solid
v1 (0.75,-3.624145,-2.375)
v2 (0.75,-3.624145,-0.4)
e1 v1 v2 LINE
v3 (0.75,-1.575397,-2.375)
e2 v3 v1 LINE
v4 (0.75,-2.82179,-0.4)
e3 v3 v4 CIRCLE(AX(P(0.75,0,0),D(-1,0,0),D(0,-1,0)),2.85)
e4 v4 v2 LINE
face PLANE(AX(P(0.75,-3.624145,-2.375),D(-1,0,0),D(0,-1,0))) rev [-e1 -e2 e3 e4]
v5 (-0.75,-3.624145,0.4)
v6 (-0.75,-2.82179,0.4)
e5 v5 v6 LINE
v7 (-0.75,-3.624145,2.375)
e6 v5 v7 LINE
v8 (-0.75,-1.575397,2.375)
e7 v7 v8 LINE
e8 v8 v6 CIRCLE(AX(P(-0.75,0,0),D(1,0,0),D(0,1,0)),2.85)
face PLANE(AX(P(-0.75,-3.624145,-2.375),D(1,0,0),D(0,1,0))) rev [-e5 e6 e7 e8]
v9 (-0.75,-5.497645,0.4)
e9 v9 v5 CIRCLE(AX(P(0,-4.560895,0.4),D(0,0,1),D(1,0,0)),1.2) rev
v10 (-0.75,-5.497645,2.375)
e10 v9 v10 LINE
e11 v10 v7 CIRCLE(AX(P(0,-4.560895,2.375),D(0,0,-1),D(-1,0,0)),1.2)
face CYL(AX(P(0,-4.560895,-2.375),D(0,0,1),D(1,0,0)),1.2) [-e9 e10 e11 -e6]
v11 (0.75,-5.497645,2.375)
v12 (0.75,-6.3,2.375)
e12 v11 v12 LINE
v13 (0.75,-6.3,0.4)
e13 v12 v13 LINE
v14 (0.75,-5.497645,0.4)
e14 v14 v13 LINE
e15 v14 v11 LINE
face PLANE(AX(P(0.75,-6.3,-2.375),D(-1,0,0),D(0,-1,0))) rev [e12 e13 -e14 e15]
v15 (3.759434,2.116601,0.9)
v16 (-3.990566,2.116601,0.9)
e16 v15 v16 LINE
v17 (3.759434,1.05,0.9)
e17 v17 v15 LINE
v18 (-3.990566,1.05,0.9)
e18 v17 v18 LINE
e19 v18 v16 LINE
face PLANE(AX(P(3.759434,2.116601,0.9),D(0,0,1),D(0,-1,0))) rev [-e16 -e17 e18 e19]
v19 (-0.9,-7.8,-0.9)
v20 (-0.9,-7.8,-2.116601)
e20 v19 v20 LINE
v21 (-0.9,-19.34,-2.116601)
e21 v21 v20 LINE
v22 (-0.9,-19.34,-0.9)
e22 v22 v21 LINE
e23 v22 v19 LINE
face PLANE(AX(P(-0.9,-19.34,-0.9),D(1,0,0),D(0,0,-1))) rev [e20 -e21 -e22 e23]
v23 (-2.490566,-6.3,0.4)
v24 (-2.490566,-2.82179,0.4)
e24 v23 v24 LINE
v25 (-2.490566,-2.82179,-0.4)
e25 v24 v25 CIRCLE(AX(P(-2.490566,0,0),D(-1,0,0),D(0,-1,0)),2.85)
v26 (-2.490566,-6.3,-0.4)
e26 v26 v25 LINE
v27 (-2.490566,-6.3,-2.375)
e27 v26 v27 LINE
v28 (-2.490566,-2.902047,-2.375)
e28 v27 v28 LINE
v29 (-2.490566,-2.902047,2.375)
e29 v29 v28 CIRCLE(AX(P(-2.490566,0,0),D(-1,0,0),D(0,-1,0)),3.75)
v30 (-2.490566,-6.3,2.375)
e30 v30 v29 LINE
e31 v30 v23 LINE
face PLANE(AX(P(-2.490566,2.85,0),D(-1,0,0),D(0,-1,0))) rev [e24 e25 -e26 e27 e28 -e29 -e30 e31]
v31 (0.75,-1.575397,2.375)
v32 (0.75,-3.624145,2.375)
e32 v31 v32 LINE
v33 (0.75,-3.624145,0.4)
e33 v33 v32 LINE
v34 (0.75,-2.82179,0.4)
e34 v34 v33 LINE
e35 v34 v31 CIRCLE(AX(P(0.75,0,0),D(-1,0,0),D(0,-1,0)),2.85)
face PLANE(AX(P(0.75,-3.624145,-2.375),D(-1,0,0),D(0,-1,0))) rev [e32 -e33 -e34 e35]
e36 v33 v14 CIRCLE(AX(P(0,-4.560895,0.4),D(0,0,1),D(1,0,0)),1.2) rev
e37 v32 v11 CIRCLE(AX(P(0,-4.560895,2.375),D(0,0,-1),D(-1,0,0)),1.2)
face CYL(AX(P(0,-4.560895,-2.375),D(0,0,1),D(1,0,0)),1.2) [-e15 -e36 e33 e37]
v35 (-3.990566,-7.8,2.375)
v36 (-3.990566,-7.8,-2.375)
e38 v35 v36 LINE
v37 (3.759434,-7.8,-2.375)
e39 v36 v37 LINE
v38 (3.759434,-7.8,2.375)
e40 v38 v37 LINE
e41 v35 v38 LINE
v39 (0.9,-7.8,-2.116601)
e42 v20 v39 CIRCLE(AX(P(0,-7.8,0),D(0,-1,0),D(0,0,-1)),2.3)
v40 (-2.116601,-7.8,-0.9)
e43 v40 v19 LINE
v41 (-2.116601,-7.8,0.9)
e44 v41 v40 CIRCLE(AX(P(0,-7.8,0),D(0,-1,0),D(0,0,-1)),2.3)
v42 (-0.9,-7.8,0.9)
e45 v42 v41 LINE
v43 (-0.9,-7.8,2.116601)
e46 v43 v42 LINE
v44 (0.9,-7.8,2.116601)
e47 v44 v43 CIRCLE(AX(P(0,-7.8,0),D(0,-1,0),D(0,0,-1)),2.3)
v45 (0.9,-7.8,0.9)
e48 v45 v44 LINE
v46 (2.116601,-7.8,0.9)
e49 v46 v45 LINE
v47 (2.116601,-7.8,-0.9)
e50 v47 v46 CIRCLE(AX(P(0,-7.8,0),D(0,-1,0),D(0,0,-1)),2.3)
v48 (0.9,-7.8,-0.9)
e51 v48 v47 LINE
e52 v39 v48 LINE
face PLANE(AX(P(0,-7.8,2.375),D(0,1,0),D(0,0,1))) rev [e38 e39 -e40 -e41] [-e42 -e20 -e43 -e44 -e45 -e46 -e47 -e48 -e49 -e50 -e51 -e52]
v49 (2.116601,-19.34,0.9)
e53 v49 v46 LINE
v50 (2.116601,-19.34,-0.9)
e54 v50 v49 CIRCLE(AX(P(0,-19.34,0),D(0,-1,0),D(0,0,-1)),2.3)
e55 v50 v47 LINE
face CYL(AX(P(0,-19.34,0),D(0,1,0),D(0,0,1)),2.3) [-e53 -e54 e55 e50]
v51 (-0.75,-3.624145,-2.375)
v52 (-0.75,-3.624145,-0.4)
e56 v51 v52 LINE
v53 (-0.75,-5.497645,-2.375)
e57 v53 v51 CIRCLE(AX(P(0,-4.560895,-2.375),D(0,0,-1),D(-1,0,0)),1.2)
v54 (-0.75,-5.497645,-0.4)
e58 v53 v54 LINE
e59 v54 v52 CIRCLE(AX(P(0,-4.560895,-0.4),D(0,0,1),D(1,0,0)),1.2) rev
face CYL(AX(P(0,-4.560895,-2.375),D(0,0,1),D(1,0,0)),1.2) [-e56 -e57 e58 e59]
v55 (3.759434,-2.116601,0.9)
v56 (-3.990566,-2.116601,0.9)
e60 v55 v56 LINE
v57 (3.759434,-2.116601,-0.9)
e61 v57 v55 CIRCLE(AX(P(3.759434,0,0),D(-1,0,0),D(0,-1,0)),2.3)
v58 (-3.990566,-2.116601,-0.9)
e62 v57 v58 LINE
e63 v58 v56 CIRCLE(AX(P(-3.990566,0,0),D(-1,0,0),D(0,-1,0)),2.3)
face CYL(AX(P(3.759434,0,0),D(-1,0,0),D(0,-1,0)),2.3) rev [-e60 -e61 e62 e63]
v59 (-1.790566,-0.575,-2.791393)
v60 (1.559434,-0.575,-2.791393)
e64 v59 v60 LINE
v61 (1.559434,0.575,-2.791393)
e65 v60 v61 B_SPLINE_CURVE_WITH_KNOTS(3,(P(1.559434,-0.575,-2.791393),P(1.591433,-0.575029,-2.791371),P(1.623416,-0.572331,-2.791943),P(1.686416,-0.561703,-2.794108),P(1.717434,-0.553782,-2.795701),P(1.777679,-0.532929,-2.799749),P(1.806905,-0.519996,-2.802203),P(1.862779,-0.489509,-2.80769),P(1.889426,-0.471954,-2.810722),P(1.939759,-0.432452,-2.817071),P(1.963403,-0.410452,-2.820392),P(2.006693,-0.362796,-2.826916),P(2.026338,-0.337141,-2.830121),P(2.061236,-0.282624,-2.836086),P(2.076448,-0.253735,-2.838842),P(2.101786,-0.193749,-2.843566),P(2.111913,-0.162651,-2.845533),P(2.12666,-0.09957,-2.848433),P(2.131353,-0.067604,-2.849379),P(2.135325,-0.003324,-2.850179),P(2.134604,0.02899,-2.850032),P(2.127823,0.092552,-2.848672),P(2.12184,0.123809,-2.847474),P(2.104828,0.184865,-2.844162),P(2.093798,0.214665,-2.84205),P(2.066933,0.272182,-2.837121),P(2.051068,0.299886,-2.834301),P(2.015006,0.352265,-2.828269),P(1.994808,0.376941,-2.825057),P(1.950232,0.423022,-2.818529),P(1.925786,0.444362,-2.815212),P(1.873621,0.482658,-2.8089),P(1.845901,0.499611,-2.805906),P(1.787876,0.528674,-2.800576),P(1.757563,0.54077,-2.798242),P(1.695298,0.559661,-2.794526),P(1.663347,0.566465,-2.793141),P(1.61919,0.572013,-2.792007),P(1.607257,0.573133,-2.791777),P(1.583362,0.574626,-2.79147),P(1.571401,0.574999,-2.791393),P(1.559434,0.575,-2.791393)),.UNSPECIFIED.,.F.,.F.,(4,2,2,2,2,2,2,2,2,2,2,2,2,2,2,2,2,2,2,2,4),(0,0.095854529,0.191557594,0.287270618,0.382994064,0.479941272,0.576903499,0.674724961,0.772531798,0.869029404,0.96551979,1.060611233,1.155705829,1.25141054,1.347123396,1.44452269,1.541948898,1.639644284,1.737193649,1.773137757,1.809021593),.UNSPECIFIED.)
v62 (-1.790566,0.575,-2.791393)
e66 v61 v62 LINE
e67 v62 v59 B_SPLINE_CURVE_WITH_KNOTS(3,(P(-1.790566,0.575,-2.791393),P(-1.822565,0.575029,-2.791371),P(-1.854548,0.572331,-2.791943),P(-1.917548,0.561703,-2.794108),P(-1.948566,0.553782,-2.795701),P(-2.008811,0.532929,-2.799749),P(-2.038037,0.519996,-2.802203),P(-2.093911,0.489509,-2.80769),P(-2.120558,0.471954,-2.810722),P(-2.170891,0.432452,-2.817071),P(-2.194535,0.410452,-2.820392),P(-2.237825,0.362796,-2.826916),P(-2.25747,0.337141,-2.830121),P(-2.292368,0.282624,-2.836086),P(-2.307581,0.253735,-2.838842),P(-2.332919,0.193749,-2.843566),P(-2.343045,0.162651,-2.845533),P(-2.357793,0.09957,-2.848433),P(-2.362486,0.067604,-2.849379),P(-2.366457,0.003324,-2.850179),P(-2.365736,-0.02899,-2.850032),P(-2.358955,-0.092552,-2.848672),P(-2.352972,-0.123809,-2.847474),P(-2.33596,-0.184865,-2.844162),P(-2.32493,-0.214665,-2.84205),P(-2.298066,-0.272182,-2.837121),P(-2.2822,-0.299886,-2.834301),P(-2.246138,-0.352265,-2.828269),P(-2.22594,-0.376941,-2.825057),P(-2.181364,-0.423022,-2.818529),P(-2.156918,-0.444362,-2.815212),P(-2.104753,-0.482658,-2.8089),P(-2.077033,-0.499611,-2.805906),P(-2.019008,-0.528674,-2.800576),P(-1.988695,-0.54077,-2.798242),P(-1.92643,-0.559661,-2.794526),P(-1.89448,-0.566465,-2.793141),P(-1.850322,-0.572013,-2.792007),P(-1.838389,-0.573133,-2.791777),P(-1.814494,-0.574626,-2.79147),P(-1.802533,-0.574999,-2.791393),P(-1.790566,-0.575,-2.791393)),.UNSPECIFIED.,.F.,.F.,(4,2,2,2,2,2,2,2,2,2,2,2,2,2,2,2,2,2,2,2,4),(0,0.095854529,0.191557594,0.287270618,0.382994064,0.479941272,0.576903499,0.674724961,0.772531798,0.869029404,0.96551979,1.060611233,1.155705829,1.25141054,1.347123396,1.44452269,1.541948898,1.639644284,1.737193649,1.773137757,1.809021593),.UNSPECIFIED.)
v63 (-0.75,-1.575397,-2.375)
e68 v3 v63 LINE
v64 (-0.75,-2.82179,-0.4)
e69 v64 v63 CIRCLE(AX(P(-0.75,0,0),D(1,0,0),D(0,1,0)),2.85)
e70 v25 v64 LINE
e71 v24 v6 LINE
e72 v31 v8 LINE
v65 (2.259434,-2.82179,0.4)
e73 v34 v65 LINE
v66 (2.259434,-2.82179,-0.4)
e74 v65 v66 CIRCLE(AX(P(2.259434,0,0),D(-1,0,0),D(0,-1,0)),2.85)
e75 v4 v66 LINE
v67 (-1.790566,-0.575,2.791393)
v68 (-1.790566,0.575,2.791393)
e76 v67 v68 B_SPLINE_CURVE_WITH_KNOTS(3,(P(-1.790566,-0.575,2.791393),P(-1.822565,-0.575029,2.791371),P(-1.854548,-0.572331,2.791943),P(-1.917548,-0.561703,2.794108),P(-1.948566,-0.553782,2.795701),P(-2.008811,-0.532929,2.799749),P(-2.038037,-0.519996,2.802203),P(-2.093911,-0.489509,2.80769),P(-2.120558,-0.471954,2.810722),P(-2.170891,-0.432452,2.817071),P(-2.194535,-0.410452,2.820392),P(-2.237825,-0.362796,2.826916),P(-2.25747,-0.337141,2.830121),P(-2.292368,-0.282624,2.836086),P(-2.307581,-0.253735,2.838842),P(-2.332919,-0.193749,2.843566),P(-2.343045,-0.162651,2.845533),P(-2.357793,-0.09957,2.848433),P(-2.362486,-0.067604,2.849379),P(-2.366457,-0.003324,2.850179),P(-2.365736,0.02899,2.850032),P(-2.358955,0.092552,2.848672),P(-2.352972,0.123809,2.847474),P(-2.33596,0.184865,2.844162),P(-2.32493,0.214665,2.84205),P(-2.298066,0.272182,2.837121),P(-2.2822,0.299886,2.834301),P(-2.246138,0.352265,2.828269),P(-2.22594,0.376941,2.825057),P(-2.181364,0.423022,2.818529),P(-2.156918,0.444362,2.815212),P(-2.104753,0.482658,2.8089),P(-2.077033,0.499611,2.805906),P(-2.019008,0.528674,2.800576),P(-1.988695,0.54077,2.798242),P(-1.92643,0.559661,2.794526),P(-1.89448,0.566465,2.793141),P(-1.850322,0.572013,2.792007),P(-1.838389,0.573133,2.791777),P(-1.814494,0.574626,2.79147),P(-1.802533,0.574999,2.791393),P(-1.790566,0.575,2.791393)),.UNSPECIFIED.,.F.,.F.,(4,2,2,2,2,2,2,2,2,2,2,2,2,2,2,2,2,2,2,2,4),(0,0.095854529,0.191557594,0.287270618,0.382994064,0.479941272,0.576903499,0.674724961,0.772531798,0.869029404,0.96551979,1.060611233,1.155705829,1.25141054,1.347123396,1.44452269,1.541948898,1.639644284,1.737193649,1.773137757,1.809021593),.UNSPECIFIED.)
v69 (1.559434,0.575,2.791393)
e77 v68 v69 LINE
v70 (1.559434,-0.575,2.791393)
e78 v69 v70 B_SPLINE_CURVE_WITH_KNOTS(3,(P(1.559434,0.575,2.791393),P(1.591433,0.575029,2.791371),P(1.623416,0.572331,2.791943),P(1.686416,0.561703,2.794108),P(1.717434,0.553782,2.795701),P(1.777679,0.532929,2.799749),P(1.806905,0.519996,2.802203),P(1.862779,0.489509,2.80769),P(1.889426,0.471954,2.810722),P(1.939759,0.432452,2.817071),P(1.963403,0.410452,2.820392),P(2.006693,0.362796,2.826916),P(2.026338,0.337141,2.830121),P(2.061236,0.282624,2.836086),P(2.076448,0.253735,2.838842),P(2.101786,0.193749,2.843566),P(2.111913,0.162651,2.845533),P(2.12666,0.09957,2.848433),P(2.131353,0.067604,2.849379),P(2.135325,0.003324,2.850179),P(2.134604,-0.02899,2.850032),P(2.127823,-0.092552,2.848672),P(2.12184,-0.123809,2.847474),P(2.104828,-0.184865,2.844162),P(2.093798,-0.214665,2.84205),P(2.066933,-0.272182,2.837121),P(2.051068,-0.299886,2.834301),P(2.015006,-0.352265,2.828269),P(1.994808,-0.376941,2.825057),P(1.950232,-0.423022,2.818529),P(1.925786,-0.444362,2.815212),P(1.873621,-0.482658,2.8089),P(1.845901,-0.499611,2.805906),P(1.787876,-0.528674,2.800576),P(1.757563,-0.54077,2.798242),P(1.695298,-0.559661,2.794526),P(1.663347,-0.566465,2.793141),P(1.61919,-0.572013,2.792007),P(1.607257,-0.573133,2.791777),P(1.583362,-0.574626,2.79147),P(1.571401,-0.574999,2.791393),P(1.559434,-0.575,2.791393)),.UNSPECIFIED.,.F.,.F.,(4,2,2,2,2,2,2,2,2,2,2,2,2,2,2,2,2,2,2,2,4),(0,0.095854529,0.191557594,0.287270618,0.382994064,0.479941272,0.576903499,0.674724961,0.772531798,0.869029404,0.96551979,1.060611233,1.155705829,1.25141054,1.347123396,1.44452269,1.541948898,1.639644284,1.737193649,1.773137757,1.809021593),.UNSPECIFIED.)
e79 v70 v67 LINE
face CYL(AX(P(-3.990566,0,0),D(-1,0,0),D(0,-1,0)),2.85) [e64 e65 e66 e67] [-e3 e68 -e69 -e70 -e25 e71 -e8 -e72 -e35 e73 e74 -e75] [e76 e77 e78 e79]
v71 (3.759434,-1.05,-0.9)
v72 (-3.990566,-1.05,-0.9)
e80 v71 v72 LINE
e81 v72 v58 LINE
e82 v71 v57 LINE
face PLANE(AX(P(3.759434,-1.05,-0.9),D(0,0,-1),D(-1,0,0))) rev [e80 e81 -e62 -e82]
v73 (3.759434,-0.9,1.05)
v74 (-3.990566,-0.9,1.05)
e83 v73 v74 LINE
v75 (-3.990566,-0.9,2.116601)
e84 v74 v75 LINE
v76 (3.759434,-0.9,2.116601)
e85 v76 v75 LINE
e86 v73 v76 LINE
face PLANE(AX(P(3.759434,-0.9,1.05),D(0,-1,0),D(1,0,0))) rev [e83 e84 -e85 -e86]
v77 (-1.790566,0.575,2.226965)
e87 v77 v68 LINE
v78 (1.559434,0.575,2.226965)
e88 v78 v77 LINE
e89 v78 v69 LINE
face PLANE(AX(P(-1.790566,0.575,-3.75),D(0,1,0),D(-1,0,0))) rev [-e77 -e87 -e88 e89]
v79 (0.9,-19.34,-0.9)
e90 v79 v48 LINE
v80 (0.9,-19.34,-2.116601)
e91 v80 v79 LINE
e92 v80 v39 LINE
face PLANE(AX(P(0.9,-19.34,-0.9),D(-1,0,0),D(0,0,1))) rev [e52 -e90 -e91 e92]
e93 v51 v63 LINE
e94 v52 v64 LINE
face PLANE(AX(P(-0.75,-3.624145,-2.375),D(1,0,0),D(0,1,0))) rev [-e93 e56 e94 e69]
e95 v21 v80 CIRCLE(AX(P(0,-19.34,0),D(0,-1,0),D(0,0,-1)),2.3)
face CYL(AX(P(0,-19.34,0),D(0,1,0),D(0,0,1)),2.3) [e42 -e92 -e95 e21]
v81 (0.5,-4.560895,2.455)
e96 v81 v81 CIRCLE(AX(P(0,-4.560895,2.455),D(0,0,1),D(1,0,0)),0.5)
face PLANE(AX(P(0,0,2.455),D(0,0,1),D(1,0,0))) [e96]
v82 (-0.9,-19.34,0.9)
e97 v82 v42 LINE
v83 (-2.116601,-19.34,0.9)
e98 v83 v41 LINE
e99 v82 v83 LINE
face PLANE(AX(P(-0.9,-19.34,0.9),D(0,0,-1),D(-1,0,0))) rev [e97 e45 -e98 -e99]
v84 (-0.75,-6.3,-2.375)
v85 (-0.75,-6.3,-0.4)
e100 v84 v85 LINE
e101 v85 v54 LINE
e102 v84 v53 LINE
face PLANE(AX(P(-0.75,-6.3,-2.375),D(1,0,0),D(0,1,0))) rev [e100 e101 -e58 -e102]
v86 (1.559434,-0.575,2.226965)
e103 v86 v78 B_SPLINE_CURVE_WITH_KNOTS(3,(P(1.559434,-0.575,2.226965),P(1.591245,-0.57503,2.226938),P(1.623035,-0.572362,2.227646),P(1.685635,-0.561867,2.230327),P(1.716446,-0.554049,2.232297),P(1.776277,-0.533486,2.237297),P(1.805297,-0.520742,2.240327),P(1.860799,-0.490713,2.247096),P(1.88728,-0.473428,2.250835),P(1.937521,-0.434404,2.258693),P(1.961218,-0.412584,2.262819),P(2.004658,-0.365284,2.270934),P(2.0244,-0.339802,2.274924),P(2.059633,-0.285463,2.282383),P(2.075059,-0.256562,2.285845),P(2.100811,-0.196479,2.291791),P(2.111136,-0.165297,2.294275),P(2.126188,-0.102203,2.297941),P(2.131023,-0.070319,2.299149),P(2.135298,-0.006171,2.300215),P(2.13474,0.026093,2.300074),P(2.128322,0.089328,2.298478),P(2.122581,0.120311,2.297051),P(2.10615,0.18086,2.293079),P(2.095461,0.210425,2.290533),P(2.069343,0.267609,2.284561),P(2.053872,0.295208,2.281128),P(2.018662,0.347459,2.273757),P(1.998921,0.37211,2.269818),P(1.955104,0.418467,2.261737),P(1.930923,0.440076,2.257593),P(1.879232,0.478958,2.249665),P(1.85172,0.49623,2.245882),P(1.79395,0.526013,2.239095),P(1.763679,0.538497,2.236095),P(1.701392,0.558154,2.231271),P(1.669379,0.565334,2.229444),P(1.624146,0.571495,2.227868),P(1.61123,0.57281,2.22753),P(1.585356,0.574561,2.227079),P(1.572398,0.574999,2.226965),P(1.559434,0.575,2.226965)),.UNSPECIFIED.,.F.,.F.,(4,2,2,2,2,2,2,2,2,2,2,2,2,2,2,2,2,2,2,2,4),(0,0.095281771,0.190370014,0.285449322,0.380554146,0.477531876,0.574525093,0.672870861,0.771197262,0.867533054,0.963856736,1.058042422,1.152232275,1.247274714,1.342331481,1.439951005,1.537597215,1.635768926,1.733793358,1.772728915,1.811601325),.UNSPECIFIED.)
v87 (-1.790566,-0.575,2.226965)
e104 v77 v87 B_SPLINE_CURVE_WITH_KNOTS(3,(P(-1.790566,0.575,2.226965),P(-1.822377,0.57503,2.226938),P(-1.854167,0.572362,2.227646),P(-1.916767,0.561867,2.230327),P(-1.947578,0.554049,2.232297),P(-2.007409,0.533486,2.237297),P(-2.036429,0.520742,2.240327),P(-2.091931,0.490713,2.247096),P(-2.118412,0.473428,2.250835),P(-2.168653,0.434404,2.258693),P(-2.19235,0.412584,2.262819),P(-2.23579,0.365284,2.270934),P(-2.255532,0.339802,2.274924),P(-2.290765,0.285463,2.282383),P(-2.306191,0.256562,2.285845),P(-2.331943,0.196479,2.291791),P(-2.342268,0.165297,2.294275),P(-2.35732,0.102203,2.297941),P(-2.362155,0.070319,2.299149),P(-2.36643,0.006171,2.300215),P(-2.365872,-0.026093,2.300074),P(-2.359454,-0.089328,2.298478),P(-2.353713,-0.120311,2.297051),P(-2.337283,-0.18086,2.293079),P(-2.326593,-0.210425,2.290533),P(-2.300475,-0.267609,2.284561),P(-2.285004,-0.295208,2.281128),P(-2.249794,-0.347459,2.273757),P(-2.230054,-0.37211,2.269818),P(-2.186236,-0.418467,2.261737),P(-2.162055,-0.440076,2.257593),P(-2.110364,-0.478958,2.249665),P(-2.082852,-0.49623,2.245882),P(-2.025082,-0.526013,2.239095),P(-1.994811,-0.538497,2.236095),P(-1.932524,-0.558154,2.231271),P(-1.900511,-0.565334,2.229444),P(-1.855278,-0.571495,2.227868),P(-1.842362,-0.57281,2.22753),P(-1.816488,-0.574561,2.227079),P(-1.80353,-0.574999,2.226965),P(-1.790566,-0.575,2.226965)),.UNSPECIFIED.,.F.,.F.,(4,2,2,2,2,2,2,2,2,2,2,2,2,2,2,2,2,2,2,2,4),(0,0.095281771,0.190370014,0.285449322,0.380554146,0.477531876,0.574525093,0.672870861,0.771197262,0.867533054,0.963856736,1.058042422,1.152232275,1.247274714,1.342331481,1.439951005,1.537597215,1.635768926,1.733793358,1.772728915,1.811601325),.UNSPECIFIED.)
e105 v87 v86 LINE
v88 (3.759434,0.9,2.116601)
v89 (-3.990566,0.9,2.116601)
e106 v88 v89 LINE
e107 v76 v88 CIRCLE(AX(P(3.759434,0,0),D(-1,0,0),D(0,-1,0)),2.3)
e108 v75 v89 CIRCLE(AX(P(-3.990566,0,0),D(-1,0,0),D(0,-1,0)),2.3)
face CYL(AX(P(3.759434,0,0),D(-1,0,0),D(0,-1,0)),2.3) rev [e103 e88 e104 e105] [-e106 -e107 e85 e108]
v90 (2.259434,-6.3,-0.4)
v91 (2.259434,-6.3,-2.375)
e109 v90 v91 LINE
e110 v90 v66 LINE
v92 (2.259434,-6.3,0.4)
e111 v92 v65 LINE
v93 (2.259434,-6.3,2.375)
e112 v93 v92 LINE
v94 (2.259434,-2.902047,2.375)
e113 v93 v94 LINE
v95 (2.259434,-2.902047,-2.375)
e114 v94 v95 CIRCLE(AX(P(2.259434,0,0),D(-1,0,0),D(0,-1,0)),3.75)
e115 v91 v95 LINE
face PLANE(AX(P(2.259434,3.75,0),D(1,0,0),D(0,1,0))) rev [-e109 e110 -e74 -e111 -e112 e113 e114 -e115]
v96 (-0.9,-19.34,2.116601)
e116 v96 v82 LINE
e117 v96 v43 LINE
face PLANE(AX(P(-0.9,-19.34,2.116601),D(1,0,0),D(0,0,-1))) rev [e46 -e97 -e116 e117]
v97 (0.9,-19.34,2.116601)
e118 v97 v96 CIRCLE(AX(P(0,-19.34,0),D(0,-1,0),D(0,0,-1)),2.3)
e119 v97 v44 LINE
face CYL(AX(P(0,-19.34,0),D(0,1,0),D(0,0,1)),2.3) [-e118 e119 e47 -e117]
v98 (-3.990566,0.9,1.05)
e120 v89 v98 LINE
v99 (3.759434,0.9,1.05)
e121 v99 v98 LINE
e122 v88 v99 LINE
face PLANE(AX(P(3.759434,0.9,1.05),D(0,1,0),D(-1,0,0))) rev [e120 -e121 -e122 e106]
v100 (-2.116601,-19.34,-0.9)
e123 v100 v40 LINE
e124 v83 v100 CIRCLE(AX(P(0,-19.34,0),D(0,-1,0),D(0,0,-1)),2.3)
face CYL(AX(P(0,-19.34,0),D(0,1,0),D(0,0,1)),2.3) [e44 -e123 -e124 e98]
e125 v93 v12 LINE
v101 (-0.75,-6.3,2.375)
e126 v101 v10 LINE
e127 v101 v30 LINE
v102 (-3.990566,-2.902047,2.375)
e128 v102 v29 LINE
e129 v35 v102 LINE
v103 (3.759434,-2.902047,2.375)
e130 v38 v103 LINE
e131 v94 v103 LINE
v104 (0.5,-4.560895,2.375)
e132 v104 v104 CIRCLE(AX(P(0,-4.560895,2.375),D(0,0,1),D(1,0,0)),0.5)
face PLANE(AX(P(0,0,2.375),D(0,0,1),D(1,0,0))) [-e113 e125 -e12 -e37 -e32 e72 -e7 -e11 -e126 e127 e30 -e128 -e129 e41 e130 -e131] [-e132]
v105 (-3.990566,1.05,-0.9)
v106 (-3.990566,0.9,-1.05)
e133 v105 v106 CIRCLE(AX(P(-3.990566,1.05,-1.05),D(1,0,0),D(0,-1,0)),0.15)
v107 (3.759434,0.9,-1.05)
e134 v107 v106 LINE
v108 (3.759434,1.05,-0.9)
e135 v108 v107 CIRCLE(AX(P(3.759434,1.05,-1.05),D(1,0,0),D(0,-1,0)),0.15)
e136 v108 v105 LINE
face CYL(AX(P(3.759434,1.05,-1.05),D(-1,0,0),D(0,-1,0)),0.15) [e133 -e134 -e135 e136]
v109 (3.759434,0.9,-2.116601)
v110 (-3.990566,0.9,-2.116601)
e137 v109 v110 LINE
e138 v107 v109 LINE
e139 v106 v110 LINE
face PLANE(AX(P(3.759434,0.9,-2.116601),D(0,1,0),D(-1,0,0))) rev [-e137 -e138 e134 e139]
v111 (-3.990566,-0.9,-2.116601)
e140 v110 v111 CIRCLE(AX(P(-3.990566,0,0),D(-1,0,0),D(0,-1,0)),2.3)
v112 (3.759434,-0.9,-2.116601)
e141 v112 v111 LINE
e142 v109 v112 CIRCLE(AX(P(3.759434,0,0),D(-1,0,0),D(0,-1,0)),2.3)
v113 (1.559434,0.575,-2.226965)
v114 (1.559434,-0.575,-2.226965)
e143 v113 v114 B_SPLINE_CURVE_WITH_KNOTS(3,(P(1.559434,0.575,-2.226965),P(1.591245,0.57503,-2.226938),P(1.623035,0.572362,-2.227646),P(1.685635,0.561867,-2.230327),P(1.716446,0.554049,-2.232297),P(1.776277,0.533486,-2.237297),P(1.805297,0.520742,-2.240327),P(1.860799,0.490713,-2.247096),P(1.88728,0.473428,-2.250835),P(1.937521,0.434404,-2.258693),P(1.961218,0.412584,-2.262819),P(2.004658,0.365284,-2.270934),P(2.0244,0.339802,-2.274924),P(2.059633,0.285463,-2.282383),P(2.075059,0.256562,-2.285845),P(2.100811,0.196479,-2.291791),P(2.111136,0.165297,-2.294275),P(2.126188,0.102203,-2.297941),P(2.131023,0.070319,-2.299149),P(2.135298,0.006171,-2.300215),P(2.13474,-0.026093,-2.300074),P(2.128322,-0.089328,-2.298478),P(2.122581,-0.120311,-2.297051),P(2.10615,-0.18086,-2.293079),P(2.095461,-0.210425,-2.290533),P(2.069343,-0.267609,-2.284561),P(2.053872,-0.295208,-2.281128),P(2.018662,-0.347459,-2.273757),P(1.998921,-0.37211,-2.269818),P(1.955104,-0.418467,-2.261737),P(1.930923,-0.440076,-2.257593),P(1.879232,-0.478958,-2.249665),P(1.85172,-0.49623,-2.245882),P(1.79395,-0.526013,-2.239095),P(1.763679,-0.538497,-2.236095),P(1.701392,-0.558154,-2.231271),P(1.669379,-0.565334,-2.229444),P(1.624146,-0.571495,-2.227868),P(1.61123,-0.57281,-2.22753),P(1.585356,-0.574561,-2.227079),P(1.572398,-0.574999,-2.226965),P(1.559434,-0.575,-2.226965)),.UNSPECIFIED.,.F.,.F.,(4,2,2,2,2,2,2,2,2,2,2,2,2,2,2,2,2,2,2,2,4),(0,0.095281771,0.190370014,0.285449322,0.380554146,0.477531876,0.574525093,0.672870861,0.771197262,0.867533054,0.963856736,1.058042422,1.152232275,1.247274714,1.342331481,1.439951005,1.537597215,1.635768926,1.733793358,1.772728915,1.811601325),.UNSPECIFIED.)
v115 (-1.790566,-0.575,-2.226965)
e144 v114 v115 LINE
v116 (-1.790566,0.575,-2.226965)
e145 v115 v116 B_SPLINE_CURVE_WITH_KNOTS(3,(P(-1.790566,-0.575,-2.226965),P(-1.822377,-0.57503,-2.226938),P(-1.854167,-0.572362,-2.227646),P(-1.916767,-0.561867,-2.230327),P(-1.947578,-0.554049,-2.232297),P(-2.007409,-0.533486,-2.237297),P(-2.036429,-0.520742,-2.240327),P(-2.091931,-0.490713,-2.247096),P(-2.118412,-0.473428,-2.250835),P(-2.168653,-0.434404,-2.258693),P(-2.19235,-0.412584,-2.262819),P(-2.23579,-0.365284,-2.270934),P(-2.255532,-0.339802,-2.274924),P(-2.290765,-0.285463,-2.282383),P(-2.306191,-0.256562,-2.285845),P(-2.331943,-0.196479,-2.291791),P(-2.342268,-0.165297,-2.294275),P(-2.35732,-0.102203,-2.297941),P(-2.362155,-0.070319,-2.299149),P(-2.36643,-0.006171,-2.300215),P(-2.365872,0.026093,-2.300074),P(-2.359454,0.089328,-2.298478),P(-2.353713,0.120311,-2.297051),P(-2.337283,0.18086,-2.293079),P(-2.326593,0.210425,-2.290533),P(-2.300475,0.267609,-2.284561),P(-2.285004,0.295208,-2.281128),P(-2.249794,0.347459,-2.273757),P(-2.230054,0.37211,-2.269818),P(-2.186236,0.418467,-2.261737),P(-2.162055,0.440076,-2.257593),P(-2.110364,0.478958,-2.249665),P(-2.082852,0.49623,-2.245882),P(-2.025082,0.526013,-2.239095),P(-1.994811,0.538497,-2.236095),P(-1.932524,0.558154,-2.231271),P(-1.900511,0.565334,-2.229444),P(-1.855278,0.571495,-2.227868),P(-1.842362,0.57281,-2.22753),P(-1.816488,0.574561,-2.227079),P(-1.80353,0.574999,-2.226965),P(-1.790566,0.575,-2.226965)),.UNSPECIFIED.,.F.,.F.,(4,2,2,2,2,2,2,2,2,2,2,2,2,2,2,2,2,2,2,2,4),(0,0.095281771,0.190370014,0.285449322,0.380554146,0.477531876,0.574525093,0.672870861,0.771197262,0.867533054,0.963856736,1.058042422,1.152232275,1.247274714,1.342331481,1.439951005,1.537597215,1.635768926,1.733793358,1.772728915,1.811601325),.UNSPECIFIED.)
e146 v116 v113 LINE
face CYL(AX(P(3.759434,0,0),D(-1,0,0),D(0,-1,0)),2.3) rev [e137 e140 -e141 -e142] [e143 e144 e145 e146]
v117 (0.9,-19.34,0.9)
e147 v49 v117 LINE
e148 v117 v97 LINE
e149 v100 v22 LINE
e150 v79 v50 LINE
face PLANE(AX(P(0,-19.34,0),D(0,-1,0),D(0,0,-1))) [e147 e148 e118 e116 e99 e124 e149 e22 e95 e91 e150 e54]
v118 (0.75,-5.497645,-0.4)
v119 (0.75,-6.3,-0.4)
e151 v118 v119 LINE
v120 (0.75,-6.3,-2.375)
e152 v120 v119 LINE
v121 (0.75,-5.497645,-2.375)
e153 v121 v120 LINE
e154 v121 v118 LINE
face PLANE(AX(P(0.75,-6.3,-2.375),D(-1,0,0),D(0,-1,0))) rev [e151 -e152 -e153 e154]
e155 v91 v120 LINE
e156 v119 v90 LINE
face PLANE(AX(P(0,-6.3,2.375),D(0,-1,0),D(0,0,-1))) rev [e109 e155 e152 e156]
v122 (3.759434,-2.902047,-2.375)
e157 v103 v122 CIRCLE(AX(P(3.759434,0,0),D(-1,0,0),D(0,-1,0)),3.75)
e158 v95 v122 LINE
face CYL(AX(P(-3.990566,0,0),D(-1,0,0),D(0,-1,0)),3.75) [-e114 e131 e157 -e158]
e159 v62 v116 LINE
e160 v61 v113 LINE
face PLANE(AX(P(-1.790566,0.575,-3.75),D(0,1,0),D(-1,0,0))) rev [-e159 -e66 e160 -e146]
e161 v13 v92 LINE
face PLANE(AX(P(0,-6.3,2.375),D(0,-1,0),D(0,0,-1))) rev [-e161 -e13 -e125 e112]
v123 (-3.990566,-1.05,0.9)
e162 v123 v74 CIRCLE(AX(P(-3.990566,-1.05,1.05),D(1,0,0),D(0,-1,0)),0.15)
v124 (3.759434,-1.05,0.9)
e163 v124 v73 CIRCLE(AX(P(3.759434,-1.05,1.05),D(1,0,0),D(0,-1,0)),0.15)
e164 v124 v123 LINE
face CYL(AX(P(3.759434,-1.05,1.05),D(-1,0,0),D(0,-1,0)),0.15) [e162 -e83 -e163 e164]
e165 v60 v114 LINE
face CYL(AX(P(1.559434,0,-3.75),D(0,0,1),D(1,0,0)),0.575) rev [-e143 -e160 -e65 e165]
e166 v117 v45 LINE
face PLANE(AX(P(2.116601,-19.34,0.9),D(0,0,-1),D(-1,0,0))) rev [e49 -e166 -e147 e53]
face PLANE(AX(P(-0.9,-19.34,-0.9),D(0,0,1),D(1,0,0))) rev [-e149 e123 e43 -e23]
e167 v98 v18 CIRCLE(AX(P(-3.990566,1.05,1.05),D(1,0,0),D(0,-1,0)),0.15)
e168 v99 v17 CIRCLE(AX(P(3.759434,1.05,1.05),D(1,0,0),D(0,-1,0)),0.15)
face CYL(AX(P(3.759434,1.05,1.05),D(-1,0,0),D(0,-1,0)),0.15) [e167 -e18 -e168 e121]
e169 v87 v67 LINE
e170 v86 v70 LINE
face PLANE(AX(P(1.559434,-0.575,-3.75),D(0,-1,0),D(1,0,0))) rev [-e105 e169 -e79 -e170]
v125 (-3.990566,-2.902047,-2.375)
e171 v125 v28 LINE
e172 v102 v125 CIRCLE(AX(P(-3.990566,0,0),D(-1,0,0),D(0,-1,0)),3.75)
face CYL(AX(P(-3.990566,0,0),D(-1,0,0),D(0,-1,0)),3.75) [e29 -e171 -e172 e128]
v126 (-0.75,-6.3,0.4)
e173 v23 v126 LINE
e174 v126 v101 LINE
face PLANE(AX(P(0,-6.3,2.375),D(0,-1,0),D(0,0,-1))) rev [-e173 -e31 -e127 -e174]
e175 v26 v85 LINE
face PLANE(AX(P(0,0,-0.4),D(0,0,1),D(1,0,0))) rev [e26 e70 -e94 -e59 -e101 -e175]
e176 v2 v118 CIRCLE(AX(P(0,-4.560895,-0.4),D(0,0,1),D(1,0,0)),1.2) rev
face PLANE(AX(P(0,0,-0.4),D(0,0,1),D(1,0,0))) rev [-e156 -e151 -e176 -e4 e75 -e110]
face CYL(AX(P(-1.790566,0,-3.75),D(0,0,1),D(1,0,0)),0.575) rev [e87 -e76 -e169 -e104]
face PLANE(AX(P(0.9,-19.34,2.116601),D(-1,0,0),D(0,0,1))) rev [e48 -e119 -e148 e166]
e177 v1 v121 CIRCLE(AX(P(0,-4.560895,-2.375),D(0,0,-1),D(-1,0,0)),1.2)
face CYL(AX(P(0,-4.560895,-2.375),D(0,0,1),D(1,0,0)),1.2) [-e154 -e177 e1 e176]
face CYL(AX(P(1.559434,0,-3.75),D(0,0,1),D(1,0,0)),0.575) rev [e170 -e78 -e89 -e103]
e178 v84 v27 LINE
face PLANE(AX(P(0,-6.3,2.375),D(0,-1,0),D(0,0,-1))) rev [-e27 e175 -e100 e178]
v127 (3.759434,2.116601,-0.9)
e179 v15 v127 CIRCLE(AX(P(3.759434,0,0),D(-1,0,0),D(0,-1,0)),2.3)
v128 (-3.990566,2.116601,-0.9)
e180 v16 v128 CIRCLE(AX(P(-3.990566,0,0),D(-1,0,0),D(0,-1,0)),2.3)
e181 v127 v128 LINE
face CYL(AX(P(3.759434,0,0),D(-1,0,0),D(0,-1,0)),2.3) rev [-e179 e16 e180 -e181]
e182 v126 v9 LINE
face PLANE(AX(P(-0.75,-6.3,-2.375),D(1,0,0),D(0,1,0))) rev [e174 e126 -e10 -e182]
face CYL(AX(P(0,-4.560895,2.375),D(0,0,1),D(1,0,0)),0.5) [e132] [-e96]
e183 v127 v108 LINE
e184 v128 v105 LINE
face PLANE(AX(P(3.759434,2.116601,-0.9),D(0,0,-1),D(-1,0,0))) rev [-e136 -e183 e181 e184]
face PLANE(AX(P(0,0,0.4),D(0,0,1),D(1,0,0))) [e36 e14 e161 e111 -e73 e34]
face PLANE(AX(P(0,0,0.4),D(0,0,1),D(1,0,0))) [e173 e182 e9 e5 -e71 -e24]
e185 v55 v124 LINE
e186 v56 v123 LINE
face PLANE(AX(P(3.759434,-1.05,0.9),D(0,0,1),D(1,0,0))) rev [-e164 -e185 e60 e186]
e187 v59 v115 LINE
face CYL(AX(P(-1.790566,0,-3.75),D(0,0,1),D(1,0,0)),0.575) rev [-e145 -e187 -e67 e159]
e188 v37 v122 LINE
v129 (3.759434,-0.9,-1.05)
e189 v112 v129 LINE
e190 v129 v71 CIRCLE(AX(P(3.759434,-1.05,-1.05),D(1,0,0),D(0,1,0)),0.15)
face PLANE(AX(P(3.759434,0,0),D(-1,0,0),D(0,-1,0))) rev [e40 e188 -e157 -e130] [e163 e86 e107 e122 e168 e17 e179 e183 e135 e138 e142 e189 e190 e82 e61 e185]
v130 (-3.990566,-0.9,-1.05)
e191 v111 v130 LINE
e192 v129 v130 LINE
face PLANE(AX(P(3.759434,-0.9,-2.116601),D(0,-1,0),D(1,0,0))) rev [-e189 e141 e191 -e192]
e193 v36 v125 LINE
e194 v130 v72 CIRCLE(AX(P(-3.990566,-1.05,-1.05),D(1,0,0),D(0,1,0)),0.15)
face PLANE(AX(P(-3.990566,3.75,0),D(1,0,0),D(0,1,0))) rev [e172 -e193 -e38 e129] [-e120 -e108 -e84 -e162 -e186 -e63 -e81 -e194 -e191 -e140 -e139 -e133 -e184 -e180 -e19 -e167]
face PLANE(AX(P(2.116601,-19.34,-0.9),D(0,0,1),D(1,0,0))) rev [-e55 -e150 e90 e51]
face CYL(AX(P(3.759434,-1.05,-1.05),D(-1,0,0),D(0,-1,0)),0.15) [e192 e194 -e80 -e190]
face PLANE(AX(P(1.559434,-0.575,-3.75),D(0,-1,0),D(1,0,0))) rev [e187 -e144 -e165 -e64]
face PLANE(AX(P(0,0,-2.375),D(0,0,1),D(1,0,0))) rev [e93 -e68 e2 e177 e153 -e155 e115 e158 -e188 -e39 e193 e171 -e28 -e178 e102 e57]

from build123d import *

# Parameters (mm, degrees)
SKETCH3_W               = 4.75
SKETCH3_H               = 5.746351638
BOSS_EXTRUDE1_DEPTH     = 0.4
BOSS_EXTRUDE2_DEPTH     = 2.375
BOSS_EXTRUDE3_DEPTH     = 2.375
CUT_EXTRUDE1_DEPTH      = 12.617443781
CUT_EXTRUDE2_DEPTH      = 10.530326191
CUT_EXTRUDE2_DEPTH_BACK = 10.530326191
WRAP1_OUTLINE_R         = 0.5
WRAP1_DEPTH             = 0.08
BOSS_EXTRUDE4_DEPTH     = 11.54


# Read off the part's stored shape, not the designer's step: Wrap1
with BuildPart() as part:
    # Sketch1 → Revolve1 (revolve)
    with BuildSketch(Plane.XY, mode=Mode.PRIVATE) as revolve1_sk:
        Polygon((-3.990566038, 0), (3.759433962, 0), (3.759433962, 3.75), (2.259433962, 3.75), (2.259433962, 2.85), (-2.490566038, 2.85), (-2.490566038, 3.75), (-3.990566038, 3.75), align=None)
    revolve(revolve1_sk.sketch.rotate(Axis((-3.990566038, 0, 0), (1, 0, 0)), 180), axis=Axis((-3.990566038, 0, 0), (1, 0, 0)))

    # Sketch3 → Boss-Extrude1 (add, symmetric)
    with BuildSketch(Plane.XY):
        with Locations((-0.115566038, -3.426824181)):
            Rectangle(SKETCH3_W, SKETCH3_H)
    extrude(amount=BOSS_EXTRUDE1_DEPTH, both=True)

    # Sketch3<7> → Boss-Extrude2 (add, symmetric)
    with BuildSketch(Plane.XY):
        Polygon((2.259433962, -0.553648362), (2.259433962, -6.3), (-2.490566038, -6.3), (-2.490566038, -0.553648362), (-3.990566038, -0.553648362), (-3.990566038, -7.8), (3.759433962, -7.8), (3.759433962, -0.553648362), align=None)
    extrude(amount=BOSS_EXTRUDE2_DEPTH, both=True)

    # Sketch5 → Boss-Extrude3 (add, symmetric)
    with BuildSketch(Plane(origin=(0, 0, 0), x_dir=(-1, 0, 0), z_dir=(0, 0, -1))):
        with BuildLine():
            Line((-0.75, -6.3), (0.75, -6.3))
            Line((0.75, -6.3), (0.75, -5.497644806))
            ThreePointArc((0.75, -5.497644806), (1.2, -4.560895106), (0.75, -3.624145406))
            Line((0.75, -3.624145406), (0.75, -2.821790212))
            Line((0.75, -2.821790212), (0.75, -1.153612006))
            Line((0.75, -1.153612006), (-0.75, -1.153612006))
            Line((-0.75, -1.153612006), (-0.75, -2.821790212))
            Line((-0.75, -2.821790212), (-0.75, -3.624145406))
            ThreePointArc((-0.75, -3.624145406), (-1.2, -4.560895106), (-0.75, -5.497644806))
            Line((-0.75, -5.497644806), (-0.75, -6.3))
        make_face()
    extrude(amount=BOSS_EXTRUDE3_DEPTH, both=True)

    # Sketch2 → Cut-Extrude1 (cut, through all)
    with BuildSketch(Plane.ZY.offset(3.990566038)):
        with BuildLine():
            Line((-0.9, 2.116601049), (-0.9, 1.05))
            ThreePointArc((-0.9, 1.05), (-0.943933983, 0.943933983), (-1.05, 0.9))
            Line((-1.05, 0.9), (-2.116601049, 0.9))
            ThreePointArc((-2.116601049, 0.9), (-2.3, 0), (-2.116601049, -0.9))
            Line((-2.116601049, -0.9), (-1.05, -0.9))
            ThreePointArc((-1.05, -0.9), (-0.943933983, -0.943933983), (-0.9, -1.05))
            Line((-0.9, -1.05), (-0.9, -2.116601049))
            ThreePointArc((-0.9, -2.116601049), (0, -2.3), (0.9, -2.116601049))
            Line((0.9, -2.116601049), (0.9, -1.05))
            ThreePointArc((0.9, -1.05), (0.943933983, -0.943933983), (1.05, -0.9))
            Line((1.05, -0.9), (2.116601049, -0.9))
            ThreePointArc((2.116601049, -0.9), (2.3, 0), (2.116601049, 0.9))
            Line((2.116601049, 0.9), (1.05, 0.9))
            ThreePointArc((1.05, 0.9), (0.943933983, 0.943933983), (0.9, 1.05))
            Line((0.9, 1.05), (0.9, 2.116601049))
            ThreePointArc((0.9, 2.116601049), (0, 2.3), (-0.9, 2.116601049))
        make_face()
    extrude(amount=-CUT_EXTRUDE1_DEPTH, mode=Mode.SUBTRACT)

    # Sketch4 → Cut-Extrude2 (cut, two sides: drawn at the far end of the back side and taken through both)
    with BuildSketch(Plane.XY.offset(-CUT_EXTRUDE2_DEPTH_BACK)):
        with BuildLine():
            Line((-1.790566038, 0.575), (1.559433962, 0.575))
            ThreePointArc((1.559433962, 0.575), (2.134433962, 0), (1.559433962, -0.575))
            Line((1.559433962, -0.575), (-1.790566038, -0.575))
            ThreePointArc((-1.790566038, -0.575), (-2.365566038, 0), (-1.790566038, 0.575))
        make_face()
    extrude(amount=CUT_EXTRUDE2_DEPTH + CUT_EXTRUDE2_DEPTH_BACK, mode=Mode.SUBTRACT)

    # Wrap1 outline → Wrap1 (add)
    with BuildSketch(Plane.XY.offset(2.375)):
        with Locations((0, -4.560895106)):
            Circle(WRAP1_OUTLINE_R)
    extrude(amount=WRAP1_DEPTH)

    # Sketch7 → Boss-Extrude4 (add)
    with BuildSketch(Plane.XZ.offset(7.8)):
        with BuildLine():
            Line((-0.9, 2.116601049), (-0.9, 0.9))
            Line((-0.9, 0.9), (-2.116601049, 0.9))
            ThreePointArc((-2.116601049, 0.9), (-2.3, 0), (-2.116601049, -0.9))
            Line((-2.116601049, -0.9), (-0.9, -0.9))
            Line((-0.9, -0.9), (-0.9, -2.116601049))
            ThreePointArc((-0.9, -2.116601049), (0, -2.3), (0.9, -2.116601049))
            Line((0.9, -2.116601049), (0.9, -0.9))
            Line((0.9, -0.9), (2.116601049, -0.9))
            ThreePointArc((2.116601049, -0.9), (2.3, 0), (2.116601049, 0.9))
            Line((2.116601049, 0.9), (0.9, 0.9))
            Line((0.9, 0.9), (0.9, 2.116601049))
            ThreePointArc((0.9, 2.116601049), (0, 2.3), (-0.9, 2.116601049))
        make_face()
    extrude(amount=BOSS_EXTRUDE4_DEPTH)


solid = part.part
